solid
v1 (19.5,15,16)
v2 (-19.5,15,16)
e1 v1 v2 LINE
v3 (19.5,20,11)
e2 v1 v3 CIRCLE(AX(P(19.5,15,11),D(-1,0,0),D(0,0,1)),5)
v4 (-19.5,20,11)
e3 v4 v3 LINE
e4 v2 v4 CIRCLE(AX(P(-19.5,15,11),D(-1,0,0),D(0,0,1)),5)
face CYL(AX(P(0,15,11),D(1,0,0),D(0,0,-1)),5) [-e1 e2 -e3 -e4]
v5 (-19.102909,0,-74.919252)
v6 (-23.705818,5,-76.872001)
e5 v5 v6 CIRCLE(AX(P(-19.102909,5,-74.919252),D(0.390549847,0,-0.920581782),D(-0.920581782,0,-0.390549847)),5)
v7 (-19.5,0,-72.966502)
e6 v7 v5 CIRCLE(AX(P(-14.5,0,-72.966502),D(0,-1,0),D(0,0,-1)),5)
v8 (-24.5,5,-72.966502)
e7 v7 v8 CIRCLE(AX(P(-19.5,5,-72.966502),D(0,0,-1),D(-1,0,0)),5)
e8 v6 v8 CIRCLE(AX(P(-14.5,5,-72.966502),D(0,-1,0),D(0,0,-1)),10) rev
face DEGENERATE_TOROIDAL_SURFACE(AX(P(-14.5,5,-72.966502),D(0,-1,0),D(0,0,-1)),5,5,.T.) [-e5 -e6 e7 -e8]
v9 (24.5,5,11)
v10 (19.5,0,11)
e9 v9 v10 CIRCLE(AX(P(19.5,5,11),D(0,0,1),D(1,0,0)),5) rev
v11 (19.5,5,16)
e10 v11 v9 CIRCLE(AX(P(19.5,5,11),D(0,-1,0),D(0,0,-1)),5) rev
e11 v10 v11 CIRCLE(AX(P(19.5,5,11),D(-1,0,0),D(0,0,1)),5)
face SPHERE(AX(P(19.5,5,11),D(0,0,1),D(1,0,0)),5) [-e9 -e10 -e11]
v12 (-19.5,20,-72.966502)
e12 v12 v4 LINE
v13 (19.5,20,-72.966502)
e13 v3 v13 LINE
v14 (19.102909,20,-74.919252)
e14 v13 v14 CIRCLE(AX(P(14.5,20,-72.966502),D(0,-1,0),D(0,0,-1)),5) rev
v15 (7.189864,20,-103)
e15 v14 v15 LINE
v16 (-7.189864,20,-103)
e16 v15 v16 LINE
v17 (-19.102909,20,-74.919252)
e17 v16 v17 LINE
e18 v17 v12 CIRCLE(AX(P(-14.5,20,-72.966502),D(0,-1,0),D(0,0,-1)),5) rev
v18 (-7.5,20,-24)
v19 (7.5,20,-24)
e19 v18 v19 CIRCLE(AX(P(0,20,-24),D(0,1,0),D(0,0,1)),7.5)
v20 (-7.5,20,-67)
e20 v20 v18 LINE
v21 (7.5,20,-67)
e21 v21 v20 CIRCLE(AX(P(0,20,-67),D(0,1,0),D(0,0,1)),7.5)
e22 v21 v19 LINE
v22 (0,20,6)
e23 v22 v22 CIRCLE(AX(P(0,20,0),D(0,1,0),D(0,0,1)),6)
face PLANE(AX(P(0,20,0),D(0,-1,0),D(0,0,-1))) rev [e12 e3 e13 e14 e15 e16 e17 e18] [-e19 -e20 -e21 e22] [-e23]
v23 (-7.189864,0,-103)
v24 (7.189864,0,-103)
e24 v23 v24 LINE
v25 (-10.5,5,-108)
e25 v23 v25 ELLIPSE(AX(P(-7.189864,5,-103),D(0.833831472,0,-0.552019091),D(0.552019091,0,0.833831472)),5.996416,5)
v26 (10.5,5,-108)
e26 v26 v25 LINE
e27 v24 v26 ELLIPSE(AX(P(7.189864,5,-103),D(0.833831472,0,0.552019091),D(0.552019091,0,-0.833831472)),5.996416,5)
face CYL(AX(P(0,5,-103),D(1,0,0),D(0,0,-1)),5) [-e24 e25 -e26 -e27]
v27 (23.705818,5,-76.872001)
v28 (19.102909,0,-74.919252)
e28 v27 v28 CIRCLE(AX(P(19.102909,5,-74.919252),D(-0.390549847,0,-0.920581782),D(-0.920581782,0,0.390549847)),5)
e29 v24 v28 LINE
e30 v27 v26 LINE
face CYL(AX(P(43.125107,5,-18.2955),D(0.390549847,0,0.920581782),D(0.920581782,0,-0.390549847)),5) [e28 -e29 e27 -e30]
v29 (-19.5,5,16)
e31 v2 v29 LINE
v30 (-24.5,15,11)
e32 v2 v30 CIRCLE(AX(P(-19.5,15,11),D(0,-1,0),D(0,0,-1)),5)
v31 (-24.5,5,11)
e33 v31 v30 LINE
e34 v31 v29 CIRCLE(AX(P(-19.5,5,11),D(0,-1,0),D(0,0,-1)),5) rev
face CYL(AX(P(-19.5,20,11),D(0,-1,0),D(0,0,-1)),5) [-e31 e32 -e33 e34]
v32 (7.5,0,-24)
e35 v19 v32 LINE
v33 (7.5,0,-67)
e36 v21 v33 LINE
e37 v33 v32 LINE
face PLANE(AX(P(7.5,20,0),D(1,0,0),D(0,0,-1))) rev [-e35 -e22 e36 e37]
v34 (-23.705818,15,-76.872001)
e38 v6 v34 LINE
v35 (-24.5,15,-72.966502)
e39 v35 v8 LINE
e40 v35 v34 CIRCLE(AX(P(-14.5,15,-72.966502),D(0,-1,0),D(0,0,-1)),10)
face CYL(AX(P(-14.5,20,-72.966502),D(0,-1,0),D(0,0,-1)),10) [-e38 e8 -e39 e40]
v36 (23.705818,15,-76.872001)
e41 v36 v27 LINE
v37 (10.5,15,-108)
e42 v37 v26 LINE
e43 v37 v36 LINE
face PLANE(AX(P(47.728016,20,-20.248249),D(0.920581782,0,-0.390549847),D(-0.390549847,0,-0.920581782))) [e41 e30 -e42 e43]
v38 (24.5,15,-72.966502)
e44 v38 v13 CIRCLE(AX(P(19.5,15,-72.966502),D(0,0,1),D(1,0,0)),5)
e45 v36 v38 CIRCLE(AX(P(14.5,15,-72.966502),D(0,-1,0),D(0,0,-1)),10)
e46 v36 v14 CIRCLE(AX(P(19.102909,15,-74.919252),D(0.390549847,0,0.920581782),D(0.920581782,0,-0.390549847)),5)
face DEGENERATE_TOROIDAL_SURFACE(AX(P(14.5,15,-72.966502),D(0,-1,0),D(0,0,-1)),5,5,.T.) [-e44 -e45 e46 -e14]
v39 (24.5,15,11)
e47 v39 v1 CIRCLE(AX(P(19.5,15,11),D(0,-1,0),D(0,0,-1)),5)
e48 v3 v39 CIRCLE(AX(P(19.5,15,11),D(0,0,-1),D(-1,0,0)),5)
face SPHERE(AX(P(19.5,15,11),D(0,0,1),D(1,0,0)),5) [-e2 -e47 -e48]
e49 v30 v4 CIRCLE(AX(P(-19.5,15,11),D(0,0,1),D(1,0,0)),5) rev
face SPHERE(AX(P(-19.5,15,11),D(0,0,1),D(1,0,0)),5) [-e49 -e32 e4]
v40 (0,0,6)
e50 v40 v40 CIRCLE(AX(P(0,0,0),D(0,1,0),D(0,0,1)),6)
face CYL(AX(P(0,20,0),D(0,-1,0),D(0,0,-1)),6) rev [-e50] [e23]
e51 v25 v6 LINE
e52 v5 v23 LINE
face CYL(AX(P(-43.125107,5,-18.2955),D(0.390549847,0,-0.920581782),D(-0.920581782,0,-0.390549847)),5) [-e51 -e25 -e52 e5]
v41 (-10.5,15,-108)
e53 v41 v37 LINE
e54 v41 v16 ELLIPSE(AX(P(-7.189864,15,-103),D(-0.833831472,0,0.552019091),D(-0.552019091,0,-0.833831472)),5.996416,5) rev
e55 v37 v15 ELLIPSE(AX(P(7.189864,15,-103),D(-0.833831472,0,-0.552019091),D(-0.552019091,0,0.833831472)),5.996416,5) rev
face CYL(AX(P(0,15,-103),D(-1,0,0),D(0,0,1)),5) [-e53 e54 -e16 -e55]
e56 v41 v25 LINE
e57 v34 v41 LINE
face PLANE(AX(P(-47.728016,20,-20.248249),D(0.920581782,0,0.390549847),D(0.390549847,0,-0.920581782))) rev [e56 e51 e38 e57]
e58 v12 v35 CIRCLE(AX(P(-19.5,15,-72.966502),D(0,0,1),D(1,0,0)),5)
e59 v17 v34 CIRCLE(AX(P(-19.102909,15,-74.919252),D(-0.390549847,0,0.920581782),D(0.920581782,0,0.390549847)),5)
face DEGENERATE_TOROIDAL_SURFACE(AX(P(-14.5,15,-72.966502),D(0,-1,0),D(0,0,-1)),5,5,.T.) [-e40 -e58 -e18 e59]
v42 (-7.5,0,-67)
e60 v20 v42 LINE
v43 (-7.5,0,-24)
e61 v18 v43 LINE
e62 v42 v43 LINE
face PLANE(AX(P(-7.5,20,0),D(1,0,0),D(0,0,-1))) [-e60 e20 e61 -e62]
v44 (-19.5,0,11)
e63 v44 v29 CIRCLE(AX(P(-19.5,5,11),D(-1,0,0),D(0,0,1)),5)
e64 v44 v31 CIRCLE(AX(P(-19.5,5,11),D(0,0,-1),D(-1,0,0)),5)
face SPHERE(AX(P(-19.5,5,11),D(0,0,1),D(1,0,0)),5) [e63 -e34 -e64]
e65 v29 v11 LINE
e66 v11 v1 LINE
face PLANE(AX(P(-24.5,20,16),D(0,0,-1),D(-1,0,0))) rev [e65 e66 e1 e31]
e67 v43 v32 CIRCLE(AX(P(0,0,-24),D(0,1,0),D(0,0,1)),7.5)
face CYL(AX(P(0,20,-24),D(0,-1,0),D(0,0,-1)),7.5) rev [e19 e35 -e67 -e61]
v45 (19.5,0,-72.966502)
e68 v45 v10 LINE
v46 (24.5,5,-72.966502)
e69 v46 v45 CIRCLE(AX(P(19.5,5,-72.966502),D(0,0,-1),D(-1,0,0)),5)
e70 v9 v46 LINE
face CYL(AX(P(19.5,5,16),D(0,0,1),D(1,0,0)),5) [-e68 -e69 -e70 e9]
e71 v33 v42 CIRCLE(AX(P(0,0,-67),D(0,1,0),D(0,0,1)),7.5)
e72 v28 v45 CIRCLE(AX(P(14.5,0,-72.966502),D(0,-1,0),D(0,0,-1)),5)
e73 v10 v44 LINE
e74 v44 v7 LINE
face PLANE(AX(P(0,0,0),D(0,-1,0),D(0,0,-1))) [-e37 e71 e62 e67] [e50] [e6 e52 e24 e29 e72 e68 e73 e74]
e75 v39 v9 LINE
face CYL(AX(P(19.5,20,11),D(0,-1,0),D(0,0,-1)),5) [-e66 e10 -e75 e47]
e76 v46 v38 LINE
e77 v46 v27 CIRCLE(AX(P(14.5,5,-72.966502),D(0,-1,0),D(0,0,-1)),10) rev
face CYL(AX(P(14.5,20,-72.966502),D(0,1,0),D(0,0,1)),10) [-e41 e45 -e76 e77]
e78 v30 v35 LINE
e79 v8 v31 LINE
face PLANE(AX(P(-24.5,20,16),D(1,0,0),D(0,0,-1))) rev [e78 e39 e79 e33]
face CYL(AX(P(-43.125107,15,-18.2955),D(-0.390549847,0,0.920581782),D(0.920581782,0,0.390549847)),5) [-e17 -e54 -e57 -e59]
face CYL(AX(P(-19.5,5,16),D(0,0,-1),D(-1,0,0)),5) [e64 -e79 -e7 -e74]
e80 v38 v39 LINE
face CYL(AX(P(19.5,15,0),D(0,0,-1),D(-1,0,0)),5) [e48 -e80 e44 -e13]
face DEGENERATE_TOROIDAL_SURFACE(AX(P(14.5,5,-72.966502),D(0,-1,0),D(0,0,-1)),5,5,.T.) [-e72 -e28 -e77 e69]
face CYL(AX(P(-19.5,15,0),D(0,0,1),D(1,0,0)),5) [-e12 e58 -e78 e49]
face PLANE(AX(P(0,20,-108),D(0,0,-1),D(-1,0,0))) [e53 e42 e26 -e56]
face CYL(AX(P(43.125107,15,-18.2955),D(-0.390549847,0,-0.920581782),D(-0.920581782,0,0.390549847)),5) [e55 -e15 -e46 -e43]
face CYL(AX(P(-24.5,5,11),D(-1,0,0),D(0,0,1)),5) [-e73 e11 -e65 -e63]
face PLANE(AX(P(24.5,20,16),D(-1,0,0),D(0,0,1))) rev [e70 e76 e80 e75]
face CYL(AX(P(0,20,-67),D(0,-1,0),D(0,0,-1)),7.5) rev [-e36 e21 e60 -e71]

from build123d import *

# Parameters (mm, degrees)
SKETCH_1_W      = 49
SKETCH_1_H      = 32
SKETCH_1_R      = 6
EXTRUDE_1_DEPTH = 20
SKETCH_3_W      = 49
SKETCH_3_H      = 59
EXTRUDE_2_DEPTH = 20
FILLET_1_R      = 10
FILLET_2_R      = 5
FILLET_3_R      = 5
FILLET_4_R      = 5


with BuildPart() as part:
    # 草图1 → 凸台-拉伸1 (new body)
    with BuildSketch(Plane(origin=(0, 0, 0), x_dir=(1, 0, 0), z_dir=(0, 1, 0))):
        Rectangle(SKETCH_1_W, SKETCH_1_H)
        with Locations(Location((0, 0, 0), (0, 0, 270))):
            Circle(SKETCH_1_R, mode=Mode.SUBTRACT)
    extrude(amount=EXTRUDE_1_DEPTH)

    # 草图3 → 凸台-拉伸2 (add)
    # profile 1 of 2: a face of its own
    with BuildSketch(Plane(origin=(0, 0, 0), x_dir=(1, 0, 0), z_dir=(0, 1, 0))):
        with Locations((0, 45.5)):
            Rectangle(SKETCH_3_W, SKETCH_3_H)
        with BuildLine():
            ThreePointArc((-7.5, 24), (0, 16.5), (7.5, 24))
            Line((7.5, 24), (7.5, 67))
            ThreePointArc((7.5, 67), (0, 74.5), (-7.5, 67))
            Line((-7.5, 67), (-7.5, 24))
        make_face(mode=Mode.SUBTRACT)
    # profile 2 of 2: a face of its own
    with BuildSketch(Plane(origin=(0, 0, 0), x_dir=(1, 0, 0), z_dir=(0, 1, 0))):
        Polygon((10.5, 108), (24.5, 75), (-24.5, 75), (-10.5, 108), align=None)
    extrude(amount=EXTRUDE_2_DEPTH)

    # 圆角1
    fillet_1_edges = [part.edges().sort_by_distance(p)[0] for p in [
        (-24.5, 10, -75),
        (24.5, 10, -75),
    ]]
    fillet(fillet_1_edges, radius=FILLET_1_R)

    # 圆角2
    fillet_2_edges = [part.edges().sort_by_distance(p)[0] for p in [
        (24.5, 20, -28.483251194),
        (17.102908909, 20, -92.436000428),
        (0, 20, -108),
        (-17.102908909, 0, -92.436000428),
        (-17.102908909, 20, -92.436000428),
        (0, 0, -108),
        (17.102908909, 0, -92.436000428),
        (-24.5, 0, -28.483251194),
        (-24.299443305, 0, -74.959216844),
        (24.299443305, 0, -74.959216844),
        (-24.5, 20, -28.483251194),
        (-24.299443305, 20, -74.959216844),
        (24.299443305, 20, -74.959216844),
        (24.5, 0, -28.483251194),
        (24.5, 10, 16),
        (-24.5, 10, 16),
    ]]
    fillet(fillet_2_edges, radius=FILLET_2_R)

    # 圆角3
    # the kernel refuses this fillet: 5 mm, written as the material it takes off along each edge
    with BuildSketch(Plane(origin=(-19.5, 15, 11), x_dir=(0, 0, 1), z_dir=(0, 1, 0))) as fillet_3_piece_1_section:
        Polygon((0, 0), (FILLET_3_R, 0), (FILLET_3_R, -FILLET_3_R), (0, -FILLET_3_R), align=None)
    fillet_3_piece_1 = extrude(amount=FILLET_3_R, mode=Mode.PRIVATE)
    fillet_3_piece_1 = fillet_3_piece_1 - Plane(origin=(-19.5, 15, 11), x_dir=(0.7071067811865475, 0, -0.7071067811865475), z_dir=(0, 1, 0)) * Sphere(FILLET_3_R, mode=Mode.PRIVATE)
    add(fillet_3_piece_1, mode=Mode.SUBTRACT)
    with BuildSketch(Plane(origin=(19.5, 15, 11), x_dir=(0, 0, 1), z_dir=(0, 1, 0))) as fillet_3_piece_2_section:
        Polygon((0, 0), (FILLET_3_R, 0), (FILLET_3_R, FILLET_3_R), (0, FILLET_3_R), align=None)
    fillet_3_piece_2 = extrude(amount=FILLET_3_R, mode=Mode.PRIVATE)
    fillet_3_piece_2 = fillet_3_piece_2 - Plane(origin=(19.5, 15, 11), x_dir=(-0.7071067811865475, 0, -0.7071067811865475), z_dir=(0, 1, 0)) * Sphere(FILLET_3_R, mode=Mode.PRIVATE)
    add(fillet_3_piece_2, mode=Mode.SUBTRACT)
    with BuildSketch(Plane(origin=(-19.5, 20, 16), x_dir=(0, 0, -1), z_dir=(1, 0, 0))) as fillet_3_piece_3:
        with BuildLine():
            CenterArc((FILLET_3_R, -FILLET_3_R), FILLET_3_R, 90, 90)
            Line((0, -FILLET_3_R), (0, 0))
            Line((0, 0), (FILLET_3_R, 0))
        make_face()
    extrude(amount=39, mode=Mode.SUBTRACT)

    # 圆角4
    # the kernel refuses this fillet: 5 mm, written as the material it takes off along each edge
    with BuildSketch(Plane(origin=(-19.5, 5, 11), x_dir=(0, -1, 0), z_dir=(0, 0, 1))) as fillet_4_piece_1_section:
        Polygon((0, 0), (FILLET_4_R, 0), (FILLET_4_R, -FILLET_4_R), (0, -FILLET_4_R), align=None)
    fillet_4_piece_1 = extrude(amount=FILLET_4_R, mode=Mode.PRIVATE)
    fillet_4_piece_1 = fillet_4_piece_1 - Plane(origin=(-19.5, 5, 11), x_dir=(0.7071067811865475, 0.7071067811865475, 0), z_dir=(0, 0, 1)) * Sphere(FILLET_4_R, mode=Mode.PRIVATE)
    add(fillet_4_piece_1, mode=Mode.SUBTRACT)
    with BuildSketch(Plane(origin=(19.5, 5, 11), x_dir=(0, -1, 0), z_dir=(0, 0, 1))) as fillet_4_piece_2_section:
        Polygon((0, 0), (FILLET_4_R, 0), (FILLET_4_R, FILLET_4_R), (0, FILLET_4_R), align=None)
    fillet_4_piece_2 = extrude(amount=FILLET_4_R, mode=Mode.PRIVATE)
    fillet_4_piece_2 = fillet_4_piece_2 - Plane(origin=(19.5, 5, 11), x_dir=(-0.7071067811865475, 0.7071067811865475, 0), z_dir=(0, 0, 1)) * Sphere(FILLET_4_R, mode=Mode.PRIVATE)
    add(fillet_4_piece_2, mode=Mode.SUBTRACT)
    with BuildSketch(Plane(origin=(-19.5, 0, 16), x_dir=(0, 1, 0), z_dir=(1, 0, 0))) as fillet_4_piece_3:
        with BuildLine():
            CenterArc((FILLET_4_R, -FILLET_4_R), FILLET_4_R, 90, 90)
            Line((0, -FILLET_4_R), (0, 0))
            Line((0, 0), (FILLET_4_R, 0))
        make_face()
    extrude(amount=39, mode=Mode.SUBTRACT)


solid = part.part
